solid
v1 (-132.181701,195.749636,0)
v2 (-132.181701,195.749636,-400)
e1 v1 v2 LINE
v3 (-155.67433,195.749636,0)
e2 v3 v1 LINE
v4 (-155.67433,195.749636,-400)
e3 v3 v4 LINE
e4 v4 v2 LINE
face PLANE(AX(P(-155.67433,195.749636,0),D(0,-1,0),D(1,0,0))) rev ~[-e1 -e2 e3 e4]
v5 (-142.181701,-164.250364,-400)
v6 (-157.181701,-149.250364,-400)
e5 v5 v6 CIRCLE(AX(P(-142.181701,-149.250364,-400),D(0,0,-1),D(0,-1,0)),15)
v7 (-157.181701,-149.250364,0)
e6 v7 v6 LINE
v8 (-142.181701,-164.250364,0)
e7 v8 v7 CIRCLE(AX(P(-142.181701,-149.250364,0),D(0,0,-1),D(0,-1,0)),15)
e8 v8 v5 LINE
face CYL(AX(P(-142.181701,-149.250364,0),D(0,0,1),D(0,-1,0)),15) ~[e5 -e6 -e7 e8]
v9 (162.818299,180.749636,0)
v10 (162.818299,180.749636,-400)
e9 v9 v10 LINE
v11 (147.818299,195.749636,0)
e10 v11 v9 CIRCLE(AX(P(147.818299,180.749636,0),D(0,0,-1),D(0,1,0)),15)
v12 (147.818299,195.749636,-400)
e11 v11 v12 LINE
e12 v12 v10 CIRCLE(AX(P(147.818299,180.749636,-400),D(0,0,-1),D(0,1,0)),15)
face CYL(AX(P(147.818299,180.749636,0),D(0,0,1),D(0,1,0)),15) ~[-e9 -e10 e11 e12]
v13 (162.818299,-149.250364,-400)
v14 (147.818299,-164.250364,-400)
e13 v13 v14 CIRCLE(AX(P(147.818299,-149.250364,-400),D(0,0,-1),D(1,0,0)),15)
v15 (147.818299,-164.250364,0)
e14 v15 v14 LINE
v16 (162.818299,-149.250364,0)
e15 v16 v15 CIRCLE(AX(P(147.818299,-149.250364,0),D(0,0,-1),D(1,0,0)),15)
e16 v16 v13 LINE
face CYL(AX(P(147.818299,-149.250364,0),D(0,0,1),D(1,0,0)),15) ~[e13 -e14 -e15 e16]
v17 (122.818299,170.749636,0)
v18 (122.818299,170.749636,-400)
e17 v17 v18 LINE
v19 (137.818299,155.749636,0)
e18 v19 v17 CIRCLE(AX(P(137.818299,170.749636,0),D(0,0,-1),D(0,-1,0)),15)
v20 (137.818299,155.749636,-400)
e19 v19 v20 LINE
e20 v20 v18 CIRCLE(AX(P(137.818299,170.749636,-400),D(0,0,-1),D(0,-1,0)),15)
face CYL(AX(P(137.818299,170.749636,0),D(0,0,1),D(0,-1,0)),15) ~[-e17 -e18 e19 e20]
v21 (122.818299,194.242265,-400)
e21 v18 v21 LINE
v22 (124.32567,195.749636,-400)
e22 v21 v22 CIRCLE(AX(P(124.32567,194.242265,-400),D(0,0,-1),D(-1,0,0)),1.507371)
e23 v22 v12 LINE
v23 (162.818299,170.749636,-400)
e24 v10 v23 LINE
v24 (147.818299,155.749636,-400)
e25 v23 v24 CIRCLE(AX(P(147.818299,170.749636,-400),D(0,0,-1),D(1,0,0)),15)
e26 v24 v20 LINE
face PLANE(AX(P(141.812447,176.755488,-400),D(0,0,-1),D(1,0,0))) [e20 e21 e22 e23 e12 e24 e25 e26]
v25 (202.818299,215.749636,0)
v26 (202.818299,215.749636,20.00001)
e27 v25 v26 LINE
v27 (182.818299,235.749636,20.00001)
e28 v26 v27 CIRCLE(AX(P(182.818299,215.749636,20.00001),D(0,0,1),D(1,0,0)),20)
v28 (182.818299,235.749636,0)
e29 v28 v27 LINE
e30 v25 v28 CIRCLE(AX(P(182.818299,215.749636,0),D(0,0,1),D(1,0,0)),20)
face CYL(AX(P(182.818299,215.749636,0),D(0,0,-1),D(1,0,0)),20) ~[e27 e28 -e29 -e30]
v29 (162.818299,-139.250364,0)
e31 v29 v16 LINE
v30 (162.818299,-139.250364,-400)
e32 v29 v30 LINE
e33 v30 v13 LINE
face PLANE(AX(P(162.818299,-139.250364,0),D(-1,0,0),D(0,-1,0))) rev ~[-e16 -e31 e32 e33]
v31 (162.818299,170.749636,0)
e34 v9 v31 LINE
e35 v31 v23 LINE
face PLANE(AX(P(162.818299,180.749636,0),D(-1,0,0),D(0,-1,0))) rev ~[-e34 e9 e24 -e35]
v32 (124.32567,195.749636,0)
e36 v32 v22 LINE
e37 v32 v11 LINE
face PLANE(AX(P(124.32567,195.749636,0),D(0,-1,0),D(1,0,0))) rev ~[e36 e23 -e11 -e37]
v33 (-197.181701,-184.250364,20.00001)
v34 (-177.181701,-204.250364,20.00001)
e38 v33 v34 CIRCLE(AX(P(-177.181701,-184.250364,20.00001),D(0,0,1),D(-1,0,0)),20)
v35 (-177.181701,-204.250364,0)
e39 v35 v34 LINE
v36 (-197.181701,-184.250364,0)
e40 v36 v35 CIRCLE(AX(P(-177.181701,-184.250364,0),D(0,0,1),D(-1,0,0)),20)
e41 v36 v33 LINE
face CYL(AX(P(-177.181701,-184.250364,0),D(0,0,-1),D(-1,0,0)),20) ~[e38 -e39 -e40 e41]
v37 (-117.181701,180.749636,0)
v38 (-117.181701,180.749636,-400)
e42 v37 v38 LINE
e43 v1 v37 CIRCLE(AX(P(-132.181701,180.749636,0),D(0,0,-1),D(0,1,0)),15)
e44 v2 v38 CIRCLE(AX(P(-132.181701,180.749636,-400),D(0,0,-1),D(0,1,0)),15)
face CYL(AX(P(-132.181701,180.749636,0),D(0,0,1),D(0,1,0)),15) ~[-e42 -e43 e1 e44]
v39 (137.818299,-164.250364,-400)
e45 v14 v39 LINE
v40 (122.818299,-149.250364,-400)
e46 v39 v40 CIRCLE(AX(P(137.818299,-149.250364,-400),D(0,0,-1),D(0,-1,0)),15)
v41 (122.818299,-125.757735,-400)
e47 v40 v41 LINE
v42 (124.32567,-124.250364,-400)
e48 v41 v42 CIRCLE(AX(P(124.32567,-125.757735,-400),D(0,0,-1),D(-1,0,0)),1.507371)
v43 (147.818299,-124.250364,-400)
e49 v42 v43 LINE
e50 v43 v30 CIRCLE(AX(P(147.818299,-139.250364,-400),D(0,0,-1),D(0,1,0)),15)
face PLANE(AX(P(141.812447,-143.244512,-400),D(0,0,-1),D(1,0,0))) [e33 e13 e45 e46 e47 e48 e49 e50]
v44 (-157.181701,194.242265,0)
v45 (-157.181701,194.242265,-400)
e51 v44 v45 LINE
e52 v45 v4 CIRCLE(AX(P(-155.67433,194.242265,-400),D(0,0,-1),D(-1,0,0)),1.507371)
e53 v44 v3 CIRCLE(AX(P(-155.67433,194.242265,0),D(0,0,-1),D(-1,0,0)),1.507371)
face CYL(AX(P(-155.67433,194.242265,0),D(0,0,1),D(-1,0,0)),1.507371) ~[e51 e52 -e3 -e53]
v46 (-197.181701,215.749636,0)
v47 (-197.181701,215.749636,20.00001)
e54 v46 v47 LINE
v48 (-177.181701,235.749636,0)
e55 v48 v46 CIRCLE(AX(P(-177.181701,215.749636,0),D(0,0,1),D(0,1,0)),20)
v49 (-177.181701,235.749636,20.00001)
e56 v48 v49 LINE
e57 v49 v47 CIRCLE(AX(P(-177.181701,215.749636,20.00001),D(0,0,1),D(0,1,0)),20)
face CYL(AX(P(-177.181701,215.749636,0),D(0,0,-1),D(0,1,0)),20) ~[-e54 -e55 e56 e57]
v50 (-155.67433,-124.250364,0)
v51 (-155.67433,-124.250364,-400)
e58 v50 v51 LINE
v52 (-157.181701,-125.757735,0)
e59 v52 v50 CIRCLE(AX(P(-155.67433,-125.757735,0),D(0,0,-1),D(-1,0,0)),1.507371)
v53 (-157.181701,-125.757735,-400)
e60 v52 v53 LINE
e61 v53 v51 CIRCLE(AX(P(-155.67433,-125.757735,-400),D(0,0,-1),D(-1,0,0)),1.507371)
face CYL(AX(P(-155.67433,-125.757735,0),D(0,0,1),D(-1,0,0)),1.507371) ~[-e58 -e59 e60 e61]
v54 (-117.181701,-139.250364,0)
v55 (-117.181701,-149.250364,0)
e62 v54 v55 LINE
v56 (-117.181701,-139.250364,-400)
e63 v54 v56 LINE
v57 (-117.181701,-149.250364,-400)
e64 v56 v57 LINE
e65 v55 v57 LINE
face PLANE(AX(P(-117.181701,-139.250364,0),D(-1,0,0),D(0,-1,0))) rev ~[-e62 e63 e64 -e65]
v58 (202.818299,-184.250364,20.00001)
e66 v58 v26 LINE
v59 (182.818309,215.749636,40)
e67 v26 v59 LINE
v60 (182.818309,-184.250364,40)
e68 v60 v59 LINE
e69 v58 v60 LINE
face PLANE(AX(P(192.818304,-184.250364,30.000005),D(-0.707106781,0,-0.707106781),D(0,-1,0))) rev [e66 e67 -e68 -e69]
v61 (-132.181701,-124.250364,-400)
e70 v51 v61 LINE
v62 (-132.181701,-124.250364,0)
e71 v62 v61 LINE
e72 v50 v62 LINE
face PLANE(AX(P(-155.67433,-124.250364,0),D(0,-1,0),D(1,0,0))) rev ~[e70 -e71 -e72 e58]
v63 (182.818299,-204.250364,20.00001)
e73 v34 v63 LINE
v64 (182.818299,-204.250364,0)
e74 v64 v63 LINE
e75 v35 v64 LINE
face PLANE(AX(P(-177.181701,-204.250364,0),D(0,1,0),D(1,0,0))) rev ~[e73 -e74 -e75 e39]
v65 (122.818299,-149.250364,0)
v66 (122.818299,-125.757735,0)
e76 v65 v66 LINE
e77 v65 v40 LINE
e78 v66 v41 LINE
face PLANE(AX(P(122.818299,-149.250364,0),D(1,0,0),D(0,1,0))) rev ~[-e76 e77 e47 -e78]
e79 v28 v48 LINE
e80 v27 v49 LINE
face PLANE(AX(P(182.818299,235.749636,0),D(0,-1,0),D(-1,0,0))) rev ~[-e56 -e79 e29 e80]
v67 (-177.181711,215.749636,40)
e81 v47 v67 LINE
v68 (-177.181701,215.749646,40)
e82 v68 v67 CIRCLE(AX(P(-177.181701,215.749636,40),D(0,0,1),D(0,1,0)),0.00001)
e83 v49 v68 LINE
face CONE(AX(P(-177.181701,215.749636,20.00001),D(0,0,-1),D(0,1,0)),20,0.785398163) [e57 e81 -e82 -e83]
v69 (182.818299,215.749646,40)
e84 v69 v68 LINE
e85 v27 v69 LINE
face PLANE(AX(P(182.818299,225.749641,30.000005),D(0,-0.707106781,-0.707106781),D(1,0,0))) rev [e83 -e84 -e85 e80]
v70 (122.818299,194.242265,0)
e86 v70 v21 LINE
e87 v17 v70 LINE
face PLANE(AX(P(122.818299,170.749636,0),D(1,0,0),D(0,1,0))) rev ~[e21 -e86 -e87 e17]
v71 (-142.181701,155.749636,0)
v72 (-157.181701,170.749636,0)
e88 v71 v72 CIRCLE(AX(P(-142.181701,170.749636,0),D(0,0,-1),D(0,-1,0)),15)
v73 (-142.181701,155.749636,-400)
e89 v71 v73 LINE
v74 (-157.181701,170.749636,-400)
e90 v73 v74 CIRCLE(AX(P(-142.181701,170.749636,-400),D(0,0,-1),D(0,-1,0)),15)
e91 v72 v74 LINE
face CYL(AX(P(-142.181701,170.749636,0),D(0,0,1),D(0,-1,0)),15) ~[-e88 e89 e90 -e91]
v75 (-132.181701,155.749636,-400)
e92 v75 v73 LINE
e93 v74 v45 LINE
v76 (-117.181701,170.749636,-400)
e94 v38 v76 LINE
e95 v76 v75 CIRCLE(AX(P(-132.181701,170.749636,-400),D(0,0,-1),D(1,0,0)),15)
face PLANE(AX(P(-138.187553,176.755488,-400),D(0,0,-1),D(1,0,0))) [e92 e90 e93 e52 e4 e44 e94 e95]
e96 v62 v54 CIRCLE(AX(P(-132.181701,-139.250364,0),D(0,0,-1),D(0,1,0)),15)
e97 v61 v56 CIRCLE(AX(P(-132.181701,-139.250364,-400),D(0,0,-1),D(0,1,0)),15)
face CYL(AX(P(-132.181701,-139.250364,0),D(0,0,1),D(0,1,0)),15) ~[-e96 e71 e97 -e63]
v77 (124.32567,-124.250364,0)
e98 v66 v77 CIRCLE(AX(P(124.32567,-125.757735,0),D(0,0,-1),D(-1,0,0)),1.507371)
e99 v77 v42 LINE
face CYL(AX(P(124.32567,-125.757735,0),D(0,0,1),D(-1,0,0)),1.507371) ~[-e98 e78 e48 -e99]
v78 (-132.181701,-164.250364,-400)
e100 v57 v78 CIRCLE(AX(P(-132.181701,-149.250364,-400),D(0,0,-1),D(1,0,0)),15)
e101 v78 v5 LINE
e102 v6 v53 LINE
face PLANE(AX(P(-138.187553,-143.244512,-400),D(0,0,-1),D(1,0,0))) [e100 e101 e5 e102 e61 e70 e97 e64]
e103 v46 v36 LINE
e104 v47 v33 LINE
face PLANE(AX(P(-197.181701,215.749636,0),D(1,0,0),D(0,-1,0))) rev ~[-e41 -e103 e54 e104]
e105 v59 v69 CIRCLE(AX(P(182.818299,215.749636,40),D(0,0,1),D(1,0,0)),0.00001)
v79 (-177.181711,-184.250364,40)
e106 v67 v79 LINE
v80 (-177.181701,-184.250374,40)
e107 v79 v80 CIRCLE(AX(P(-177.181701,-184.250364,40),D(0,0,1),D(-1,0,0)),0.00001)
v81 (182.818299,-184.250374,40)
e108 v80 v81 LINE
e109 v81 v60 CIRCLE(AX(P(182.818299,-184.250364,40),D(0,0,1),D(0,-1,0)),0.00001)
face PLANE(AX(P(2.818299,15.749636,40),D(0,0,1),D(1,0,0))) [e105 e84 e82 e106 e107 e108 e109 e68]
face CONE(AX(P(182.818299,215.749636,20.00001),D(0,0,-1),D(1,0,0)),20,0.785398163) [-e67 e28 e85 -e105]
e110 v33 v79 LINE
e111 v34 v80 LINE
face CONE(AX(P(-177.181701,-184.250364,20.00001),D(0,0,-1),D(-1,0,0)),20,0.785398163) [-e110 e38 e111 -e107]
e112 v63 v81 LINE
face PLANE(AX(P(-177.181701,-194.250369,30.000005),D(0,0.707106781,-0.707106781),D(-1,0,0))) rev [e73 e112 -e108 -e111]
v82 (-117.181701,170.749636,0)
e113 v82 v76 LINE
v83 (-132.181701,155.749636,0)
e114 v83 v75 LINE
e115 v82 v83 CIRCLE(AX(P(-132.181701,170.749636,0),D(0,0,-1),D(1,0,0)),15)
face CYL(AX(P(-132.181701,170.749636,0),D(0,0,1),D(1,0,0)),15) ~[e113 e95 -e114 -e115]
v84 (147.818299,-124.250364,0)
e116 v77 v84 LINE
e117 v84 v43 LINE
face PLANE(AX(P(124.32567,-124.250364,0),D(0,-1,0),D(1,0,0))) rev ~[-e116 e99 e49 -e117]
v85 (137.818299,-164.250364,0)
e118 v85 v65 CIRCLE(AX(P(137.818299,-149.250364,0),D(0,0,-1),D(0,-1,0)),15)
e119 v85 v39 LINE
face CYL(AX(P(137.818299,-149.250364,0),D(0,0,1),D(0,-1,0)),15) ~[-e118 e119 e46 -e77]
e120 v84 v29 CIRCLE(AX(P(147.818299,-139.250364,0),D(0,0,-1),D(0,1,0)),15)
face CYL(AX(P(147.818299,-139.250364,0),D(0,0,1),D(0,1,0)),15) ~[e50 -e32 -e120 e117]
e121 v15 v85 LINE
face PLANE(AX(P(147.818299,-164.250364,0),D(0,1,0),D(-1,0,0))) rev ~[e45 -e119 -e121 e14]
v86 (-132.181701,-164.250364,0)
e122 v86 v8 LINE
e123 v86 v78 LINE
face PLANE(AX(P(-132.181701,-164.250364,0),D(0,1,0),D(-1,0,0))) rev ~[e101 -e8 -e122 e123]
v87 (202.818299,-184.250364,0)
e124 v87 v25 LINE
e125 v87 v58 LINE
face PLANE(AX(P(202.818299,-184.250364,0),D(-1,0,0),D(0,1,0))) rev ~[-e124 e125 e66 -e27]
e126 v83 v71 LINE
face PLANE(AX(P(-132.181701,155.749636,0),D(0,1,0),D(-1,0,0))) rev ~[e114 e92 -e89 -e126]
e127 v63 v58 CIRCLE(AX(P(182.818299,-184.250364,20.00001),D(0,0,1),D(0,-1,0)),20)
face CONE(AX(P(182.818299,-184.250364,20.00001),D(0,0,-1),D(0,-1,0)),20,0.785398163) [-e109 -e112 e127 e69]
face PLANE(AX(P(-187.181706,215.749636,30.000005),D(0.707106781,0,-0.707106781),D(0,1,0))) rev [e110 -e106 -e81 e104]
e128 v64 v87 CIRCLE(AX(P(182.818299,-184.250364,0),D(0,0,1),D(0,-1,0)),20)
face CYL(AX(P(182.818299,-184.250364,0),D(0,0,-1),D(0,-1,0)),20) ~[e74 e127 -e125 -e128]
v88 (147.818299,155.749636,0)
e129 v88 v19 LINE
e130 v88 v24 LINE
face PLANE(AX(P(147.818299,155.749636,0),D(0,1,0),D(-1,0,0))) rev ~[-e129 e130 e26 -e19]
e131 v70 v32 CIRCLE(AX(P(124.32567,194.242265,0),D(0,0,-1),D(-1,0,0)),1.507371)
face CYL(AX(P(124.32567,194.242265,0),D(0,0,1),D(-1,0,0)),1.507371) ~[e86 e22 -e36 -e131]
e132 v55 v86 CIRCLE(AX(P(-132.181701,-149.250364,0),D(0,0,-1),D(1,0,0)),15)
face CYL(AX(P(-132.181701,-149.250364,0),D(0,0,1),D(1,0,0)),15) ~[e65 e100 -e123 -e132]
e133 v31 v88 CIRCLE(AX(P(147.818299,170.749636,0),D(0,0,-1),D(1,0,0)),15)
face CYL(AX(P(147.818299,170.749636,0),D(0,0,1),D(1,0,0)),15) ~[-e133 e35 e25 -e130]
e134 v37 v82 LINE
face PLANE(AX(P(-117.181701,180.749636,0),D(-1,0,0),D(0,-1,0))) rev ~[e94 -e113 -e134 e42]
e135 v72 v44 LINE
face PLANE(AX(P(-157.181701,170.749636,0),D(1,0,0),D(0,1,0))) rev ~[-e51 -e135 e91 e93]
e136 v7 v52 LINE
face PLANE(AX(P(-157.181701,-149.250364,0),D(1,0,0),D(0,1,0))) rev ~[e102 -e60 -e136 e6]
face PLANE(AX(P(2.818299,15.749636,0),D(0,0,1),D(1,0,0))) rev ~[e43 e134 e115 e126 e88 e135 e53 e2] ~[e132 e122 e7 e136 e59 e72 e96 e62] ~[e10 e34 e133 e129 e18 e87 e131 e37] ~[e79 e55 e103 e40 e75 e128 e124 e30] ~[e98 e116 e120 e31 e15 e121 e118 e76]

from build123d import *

# Parameters (mm, degrees)
F1_DEPTH = 40
F3_DEPTH = 400
F4_SIZE  = 19.99999


# Not quite as in the source:
# - a fillet or chamfer is up to 0.001 mm smaller than in the source, because OpenCascade refuses the exact size


with BuildPart() as f1:
    # F0 (on Top) → F1 (new body)
    with BuildSketch(Plane.XY):
        with BuildLine():
            Line((182.8182994574, 235.7496355578), (-177.1817005426, 235.7496355578))
            ThreePointArc((-177.1817005426, 235.7496355578), (-191.3238361663, 229.8917711815), (-197.1817005426, 215.7496355578))
            Line((-197.1817005426, 215.7496355578), (-197.1817005426, -184.2503644422))
            ThreePointArc((-197.1817005426, -184.2503644422), (-191.3238361663, -198.3925000659), (-177.1817005426, -204.2503644422))
            Line((-177.1817005426, -204.2503644422), (182.8182994574, -204.2503644422))
            ThreePointArc((182.8182994574, -204.2503644422), (196.9604350812, -198.3925000659), (202.8182994574, -184.2503644422))
            Line((202.8182994574, -184.2503644422), (202.8182994574, 215.7496355578))
            ThreePointArc((202.8182994574, 215.7496355578), (196.9604350812, 229.8917711815), (182.8182994574, 235.7496355578))
        make_face()
    extrude(amount=F1_DEPTH)

    # F2 (on face) → F3 (join)
    with BuildSketch(Plane(origin=(0, 0, 0), x_dir=(1, 0, 0), z_dir=(0, 0, -1))):
        with BuildLine():
            Line((-155.6743295648, -195.7496355578), (-132.1817005426, -195.7496355578))
            ThreePointArc((-132.1817005426, -195.7496355578), (-121.5750988248, -191.3562372756), (-117.1817005426, -180.7496355578))
            Line((-117.1817005426, -180.7496355578), (-117.1817005426, -170.7496355578))
            ThreePointArc((-117.1817005426, -170.7496355578), (-121.5750988248, -160.14303384), (-132.1817005426, -155.7496355578))
            Line((-132.1817005426, -155.7496355578), (-142.1817005426, -155.7496355578))
            ThreePointArc((-142.1817005426, -155.7496355578), (-152.7883022604, -160.14303384), (-157.1817005426, -170.7496355578))
            Line((-157.1817005426, -170.7496355578), (-157.1817005426, -194.2422645801))
            ThreePointArc((-157.1817005426, -194.2422645801), (-156.740201805, -195.3081368202), (-155.6743295648, -195.7496355578))
        make_face()
        with BuildLine():
            Line((124.3256704352, -195.7496355578), (147.8182994574, -195.7496355578))
            ThreePointArc((147.8182994574, -195.7496355578), (158.4249011752, -191.3562372756), (162.8182994574, -180.7496355578))
            Line((162.8182994574, -180.7496355578), (162.8182994574, -170.7496355578))
            ThreePointArc((162.8182994574, -170.7496355578), (158.4249011752, -160.14303384), (147.8182994574, -155.7496355578))
            Line((147.8182994574, -155.7496355578), (137.8182994574, -155.7496355578))
            ThreePointArc((137.8182994574, -155.7496355578), (127.2116977396, -160.14303384), (122.8182994574, -170.7496355578))
            Line((122.8182994574, -170.7496355578), (122.8182994574, -194.2422645801))
            ThreePointArc((122.8182994574, -194.2422645801), (123.259798195, -195.3081368202), (124.3256704352, -195.7496355578))
        make_face()
        with BuildLine():
            Line((124.3256704352, 124.2503644422), (147.8182994574, 124.2503644422))
            ThreePointArc((147.8182994574, 124.2503644422), (158.4249011752, 128.6437627244), (162.8182994574, 139.2503644422))
            Line((162.8182994574, 139.2503644422), (162.8182994574, 149.2503644422))
            ThreePointArc((162.8182994574, 149.2503644422), (158.4249011752, 159.85696616), (147.8182994574, 164.2503644422))
            Line((147.8182994574, 164.2503644422), (137.8182994574, 164.2503644422))
            ThreePointArc((137.8182994574, 164.2503644422), (127.2116977396, 159.85696616), (122.8182994574, 149.2503644422))
            Line((122.8182994574, 149.2503644422), (122.8182994574, 125.7577354199))
            ThreePointArc((122.8182994574, 125.7577354199), (123.259798195, 124.6918631798), (124.3256704352, 124.2503644422))
        make_face()
        with BuildLine():
            Line((-155.6743295648, 124.2503644422), (-132.1817005426, 124.2503644422))
            ThreePointArc((-132.1817005426, 124.2503644422), (-121.5750988248, 128.6437627244), (-117.1817005426, 139.2503644422))
            Line((-117.1817005426, 139.2503644422), (-117.1817005426, 149.2503644422))
            ThreePointArc((-117.1817005426, 149.2503644422), (-121.5750988248, 159.85696616), (-132.1817005426, 164.2503644422))
            Line((-132.1817005426, 164.2503644422), (-142.1817005426, 164.2503644422))
            ThreePointArc((-142.1817005426, 164.2503644422), (-152.7883022604, 159.85696616), (-157.1817005426, 149.2503644422))
            Line((-157.1817005426, 149.2503644422), (-157.1817005426, 125.7577354199))
            ThreePointArc((-157.1817005426, 125.7577354199), (-156.740201805, 124.6918631798), (-155.6743295648, 124.2503644422))
        make_face()
    extrude(amount=F3_DEPTH)

    # F4 (size 20 in the source; OpenCascade refuses exactly that, so slightly less here)
    f4_edges = [f1.edges().sort_by_distance(p)[0] for p in [
        (2.818299, 235.749636, 40),
        (-191.323836, 229.891771, 40),
        (-197.181701, 15.749636, 40),
        (-191.323836, -198.3925, 40),
        (2.818299, -204.250364, 40),
        (196.960435, -198.3925, 40),
        (202.818299, 15.749636, 40),
        (196.960435, 229.891771, 40),
    ]]
    chamfer(f4_edges, length=F4_SIZE)


solid = f1.part
